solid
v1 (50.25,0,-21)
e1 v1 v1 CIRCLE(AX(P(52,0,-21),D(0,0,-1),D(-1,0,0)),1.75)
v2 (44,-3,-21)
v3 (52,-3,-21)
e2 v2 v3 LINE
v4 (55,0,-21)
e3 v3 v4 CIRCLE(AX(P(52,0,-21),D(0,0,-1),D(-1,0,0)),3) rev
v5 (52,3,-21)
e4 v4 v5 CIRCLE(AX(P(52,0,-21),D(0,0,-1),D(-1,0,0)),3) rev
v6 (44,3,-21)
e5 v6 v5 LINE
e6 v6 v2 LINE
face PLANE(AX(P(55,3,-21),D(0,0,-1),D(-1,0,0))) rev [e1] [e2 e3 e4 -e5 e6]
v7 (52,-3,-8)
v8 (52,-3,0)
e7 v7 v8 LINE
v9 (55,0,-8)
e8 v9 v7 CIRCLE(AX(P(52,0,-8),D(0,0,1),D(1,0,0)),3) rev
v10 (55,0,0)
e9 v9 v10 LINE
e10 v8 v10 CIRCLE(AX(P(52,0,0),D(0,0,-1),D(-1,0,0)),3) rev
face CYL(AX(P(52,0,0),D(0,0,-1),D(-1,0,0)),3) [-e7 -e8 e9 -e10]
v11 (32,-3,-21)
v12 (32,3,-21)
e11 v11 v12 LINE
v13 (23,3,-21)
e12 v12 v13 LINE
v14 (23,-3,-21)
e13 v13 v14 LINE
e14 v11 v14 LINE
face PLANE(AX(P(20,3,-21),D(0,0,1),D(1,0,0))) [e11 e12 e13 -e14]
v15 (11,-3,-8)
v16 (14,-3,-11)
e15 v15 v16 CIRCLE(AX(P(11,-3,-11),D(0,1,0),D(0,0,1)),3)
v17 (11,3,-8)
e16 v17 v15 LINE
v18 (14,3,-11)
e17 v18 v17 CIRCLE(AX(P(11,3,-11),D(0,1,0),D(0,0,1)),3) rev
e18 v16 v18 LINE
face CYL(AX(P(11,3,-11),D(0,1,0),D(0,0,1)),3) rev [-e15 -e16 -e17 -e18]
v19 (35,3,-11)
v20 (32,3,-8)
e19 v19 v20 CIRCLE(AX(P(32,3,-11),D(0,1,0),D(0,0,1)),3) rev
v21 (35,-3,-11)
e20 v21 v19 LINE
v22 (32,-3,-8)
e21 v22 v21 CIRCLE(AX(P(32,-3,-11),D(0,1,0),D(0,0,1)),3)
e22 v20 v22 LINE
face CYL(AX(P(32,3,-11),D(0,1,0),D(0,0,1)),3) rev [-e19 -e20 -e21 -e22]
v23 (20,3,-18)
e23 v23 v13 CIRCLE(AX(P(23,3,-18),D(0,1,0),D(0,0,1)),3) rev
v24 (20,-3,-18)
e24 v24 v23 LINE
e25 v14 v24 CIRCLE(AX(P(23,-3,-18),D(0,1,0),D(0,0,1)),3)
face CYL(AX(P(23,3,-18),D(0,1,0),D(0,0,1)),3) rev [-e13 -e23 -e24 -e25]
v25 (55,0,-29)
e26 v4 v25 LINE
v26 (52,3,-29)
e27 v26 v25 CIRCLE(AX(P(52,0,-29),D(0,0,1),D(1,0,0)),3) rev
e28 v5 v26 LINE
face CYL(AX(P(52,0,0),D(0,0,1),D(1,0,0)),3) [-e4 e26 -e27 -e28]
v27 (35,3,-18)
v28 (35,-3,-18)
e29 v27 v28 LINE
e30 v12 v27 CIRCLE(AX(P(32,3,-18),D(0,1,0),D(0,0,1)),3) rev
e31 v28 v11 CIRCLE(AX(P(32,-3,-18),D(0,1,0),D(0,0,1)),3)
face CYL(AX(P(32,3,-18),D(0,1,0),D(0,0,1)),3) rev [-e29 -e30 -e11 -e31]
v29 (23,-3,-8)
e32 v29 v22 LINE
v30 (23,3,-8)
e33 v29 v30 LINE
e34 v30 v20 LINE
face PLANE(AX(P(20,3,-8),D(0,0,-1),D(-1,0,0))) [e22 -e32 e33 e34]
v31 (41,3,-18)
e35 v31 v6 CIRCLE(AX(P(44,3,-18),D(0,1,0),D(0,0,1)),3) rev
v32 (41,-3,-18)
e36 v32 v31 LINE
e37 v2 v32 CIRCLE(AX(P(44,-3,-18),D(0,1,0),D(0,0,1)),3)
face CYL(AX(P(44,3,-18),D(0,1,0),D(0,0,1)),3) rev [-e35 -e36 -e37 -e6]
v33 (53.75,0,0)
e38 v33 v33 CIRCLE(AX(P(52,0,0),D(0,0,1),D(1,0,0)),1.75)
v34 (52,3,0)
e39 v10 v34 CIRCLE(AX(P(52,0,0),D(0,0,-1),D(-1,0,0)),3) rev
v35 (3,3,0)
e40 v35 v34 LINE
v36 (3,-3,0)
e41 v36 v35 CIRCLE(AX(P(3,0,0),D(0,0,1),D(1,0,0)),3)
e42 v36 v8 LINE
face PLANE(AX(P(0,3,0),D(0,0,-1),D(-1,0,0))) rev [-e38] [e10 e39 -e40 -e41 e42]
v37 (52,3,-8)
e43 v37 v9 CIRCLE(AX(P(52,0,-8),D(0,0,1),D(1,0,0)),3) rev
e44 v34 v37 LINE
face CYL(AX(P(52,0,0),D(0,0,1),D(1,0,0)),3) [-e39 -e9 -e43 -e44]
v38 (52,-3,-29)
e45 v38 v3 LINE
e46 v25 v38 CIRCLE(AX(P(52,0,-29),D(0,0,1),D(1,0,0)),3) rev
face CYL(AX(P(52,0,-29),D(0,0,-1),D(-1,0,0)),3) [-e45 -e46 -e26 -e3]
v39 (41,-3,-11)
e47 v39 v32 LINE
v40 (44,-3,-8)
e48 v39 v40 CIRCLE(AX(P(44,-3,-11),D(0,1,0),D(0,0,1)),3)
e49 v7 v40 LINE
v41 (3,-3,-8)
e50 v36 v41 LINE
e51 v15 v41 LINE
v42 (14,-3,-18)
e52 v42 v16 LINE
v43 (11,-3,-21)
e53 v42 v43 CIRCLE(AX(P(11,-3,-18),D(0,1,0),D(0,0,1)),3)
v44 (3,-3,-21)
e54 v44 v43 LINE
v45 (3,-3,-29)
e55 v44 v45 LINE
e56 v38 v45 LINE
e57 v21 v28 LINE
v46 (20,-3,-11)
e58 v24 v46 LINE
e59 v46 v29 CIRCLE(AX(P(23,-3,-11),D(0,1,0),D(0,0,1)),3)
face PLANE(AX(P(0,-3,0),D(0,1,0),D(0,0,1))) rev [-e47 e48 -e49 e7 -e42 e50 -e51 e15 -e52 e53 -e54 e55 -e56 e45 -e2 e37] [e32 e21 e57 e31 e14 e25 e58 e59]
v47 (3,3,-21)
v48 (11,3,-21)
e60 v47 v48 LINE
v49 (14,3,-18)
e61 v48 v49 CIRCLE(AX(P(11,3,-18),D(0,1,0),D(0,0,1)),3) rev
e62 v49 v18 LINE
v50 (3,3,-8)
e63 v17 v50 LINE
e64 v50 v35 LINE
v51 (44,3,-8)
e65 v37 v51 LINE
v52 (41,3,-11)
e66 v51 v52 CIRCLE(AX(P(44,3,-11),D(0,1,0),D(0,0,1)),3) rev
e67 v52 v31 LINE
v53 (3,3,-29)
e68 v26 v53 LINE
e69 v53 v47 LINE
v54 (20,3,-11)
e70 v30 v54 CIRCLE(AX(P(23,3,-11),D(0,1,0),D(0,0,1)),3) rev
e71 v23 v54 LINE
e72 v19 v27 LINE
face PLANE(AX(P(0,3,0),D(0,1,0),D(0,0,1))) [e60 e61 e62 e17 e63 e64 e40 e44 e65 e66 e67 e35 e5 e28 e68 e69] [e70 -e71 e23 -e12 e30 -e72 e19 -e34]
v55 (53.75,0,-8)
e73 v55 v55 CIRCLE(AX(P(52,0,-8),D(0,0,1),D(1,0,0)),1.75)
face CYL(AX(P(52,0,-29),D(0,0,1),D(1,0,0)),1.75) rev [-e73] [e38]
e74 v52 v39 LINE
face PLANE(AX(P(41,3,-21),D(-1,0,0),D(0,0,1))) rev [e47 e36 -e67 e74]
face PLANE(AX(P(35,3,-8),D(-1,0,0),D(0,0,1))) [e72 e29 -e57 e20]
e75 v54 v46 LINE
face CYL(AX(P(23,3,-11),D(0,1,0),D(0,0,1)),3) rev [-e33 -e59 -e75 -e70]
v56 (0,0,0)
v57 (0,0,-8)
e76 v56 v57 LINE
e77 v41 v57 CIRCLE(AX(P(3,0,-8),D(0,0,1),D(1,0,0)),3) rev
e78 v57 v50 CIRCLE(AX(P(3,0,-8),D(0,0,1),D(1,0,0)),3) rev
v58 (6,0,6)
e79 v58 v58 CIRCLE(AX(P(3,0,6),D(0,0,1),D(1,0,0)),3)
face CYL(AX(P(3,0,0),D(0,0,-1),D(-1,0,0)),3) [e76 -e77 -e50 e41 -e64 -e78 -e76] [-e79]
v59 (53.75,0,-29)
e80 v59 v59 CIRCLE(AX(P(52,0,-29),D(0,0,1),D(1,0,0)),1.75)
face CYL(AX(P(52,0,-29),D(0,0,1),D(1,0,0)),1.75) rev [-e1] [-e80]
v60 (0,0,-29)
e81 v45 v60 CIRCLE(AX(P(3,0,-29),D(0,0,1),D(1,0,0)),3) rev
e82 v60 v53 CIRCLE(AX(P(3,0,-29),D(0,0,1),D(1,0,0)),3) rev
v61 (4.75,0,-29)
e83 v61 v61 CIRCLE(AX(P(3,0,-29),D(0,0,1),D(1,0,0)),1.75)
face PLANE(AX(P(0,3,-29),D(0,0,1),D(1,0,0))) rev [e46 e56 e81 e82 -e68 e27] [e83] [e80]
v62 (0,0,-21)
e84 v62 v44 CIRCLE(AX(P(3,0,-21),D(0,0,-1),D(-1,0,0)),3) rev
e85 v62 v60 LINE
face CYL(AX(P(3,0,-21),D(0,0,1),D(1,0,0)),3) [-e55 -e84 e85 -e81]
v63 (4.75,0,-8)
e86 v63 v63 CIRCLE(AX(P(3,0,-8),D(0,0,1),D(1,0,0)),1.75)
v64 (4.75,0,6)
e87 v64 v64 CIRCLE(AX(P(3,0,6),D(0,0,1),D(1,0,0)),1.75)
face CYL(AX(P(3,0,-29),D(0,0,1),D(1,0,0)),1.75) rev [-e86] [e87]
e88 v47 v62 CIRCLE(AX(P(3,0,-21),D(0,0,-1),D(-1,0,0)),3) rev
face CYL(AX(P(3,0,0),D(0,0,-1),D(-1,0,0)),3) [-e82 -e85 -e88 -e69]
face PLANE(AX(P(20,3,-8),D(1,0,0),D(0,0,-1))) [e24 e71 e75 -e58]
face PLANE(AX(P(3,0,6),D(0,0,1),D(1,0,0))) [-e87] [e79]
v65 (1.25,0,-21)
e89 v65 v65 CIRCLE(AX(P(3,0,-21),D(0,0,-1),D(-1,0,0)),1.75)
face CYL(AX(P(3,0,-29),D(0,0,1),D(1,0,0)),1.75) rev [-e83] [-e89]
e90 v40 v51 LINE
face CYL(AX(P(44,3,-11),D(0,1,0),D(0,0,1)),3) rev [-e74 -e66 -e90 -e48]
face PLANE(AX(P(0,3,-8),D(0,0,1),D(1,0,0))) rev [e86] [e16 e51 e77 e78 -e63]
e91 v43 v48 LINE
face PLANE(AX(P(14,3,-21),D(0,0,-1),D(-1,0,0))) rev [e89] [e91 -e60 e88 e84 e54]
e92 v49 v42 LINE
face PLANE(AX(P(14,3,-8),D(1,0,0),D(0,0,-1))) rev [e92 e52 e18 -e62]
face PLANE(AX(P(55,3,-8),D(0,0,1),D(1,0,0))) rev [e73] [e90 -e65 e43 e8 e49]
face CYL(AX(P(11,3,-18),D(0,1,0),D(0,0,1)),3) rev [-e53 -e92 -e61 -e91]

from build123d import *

# Parameters (mm, degrees)
CROQUIS1_W                 = 15
CROQUIS1_H                 = 13
SALIENTE_EXTRUIR1_DEPTH    = 3
REDONDEO1_R                = 3
CROQUIS6_R                 = 3
SALIENTE_EXTRUIR2_DEPTH    = 6
CORTAR_EXTRUIR1_DEPTH      = 66.261014396
CORTAR_EXTRUIR1_DEPTH_BACK = 66.261014396
CROQUIS2_R                 = 1.75
CORTAR_EXTRUIR2_DEPTH      = 63.24949799
CORTAR_EXTRUIR2_DEPTH_BACK = 63.24949799
CROQUIS3_R                 = 1.75
REDONDEO2_R                = 3


with BuildPart() as part:
    # Croquis1 → Saliente-Extruir1 (new, symmetric)
    with BuildSketch(Plane(origin=(0, 0, 0), x_dir=(1, 0, 0), z_dir=(0, 1, 0))):
        Polygon((0, 0), (0, 8), (14, 8), (14, 21), (0, 21), (0, 29), (55, 29), (55, 21), (41, 21), (41, 8), (55, 8), (55, 0), align=None)
        with Locations((27.5, 14.5)):
            Rectangle(CROQUIS1_W, CROQUIS1_H, mode=Mode.SUBTRACT)
    extrude(amount=SALIENTE_EXTRUIR1_DEPTH, both=True)

    # Redondeo1
    redondeo1_edges = [part.edges().sort_by_distance(p)[0] for p in [
        (0, -3, -4),
        (0, 3, -4),
        (0, -3, -25),
        (0, 3, -25),
        (55, -3, -4),
        (55, 3, -4),
        (55, 3, -25),
        (55, -3, -25),
    ]]
    fillet(redondeo1_edges, radius=REDONDEO1_R - 0.0001)  # a hair under: the kernel refuses the full size

    # Croquis6 → Saliente-Extruir2 (add)
    with BuildSketch(Plane.XY):
        with Locations(Location((3, 0, 0), (0, 0, 180))):
            Circle(CROQUIS6_R)
    extrude(amount=SALIENTE_EXTRUIR2_DEPTH)

    # Croquis2 → Cortar-Extruir1 (cut, two sides: drawn at the far end of the back side and taken through both)
    with BuildSketch(Plane.XY.offset(6).offset(-CORTAR_EXTRUIR1_DEPTH_BACK)):
        with Locations((3, 0)):
            Circle(CROQUIS2_R)
    extrude(amount=CORTAR_EXTRUIR1_DEPTH + CORTAR_EXTRUIR1_DEPTH_BACK, mode=Mode.SUBTRACT)

    # Croquis3 → Cortar-Extruir2 (cut, two sides: drawn at the far end of the back side and taken through both)
    with BuildSketch(Plane.XY.offset(-CORTAR_EXTRUIR2_DEPTH_BACK)):
        with Locations((52, 0)):
            Circle(CROQUIS3_R)
    extrude(amount=CORTAR_EXTRUIR2_DEPTH + CORTAR_EXTRUIR2_DEPTH_BACK, mode=Mode.SUBTRACT)

    # Redondeo2
    redondeo2_edges = [part.edges().sort_by_distance(p)[0] for p in [
        (14, 0, -8),
        (14, 0, -21),
        (41, 0, -21),
        (41, 0, -8),
        (20, 0, -21),
        (20, 0, -8),
        (35, 0, -8),
        (35, 0, -21),
    ]]
    fillet(redondeo2_edges, radius=REDONDEO2_R)


solid = part.part
